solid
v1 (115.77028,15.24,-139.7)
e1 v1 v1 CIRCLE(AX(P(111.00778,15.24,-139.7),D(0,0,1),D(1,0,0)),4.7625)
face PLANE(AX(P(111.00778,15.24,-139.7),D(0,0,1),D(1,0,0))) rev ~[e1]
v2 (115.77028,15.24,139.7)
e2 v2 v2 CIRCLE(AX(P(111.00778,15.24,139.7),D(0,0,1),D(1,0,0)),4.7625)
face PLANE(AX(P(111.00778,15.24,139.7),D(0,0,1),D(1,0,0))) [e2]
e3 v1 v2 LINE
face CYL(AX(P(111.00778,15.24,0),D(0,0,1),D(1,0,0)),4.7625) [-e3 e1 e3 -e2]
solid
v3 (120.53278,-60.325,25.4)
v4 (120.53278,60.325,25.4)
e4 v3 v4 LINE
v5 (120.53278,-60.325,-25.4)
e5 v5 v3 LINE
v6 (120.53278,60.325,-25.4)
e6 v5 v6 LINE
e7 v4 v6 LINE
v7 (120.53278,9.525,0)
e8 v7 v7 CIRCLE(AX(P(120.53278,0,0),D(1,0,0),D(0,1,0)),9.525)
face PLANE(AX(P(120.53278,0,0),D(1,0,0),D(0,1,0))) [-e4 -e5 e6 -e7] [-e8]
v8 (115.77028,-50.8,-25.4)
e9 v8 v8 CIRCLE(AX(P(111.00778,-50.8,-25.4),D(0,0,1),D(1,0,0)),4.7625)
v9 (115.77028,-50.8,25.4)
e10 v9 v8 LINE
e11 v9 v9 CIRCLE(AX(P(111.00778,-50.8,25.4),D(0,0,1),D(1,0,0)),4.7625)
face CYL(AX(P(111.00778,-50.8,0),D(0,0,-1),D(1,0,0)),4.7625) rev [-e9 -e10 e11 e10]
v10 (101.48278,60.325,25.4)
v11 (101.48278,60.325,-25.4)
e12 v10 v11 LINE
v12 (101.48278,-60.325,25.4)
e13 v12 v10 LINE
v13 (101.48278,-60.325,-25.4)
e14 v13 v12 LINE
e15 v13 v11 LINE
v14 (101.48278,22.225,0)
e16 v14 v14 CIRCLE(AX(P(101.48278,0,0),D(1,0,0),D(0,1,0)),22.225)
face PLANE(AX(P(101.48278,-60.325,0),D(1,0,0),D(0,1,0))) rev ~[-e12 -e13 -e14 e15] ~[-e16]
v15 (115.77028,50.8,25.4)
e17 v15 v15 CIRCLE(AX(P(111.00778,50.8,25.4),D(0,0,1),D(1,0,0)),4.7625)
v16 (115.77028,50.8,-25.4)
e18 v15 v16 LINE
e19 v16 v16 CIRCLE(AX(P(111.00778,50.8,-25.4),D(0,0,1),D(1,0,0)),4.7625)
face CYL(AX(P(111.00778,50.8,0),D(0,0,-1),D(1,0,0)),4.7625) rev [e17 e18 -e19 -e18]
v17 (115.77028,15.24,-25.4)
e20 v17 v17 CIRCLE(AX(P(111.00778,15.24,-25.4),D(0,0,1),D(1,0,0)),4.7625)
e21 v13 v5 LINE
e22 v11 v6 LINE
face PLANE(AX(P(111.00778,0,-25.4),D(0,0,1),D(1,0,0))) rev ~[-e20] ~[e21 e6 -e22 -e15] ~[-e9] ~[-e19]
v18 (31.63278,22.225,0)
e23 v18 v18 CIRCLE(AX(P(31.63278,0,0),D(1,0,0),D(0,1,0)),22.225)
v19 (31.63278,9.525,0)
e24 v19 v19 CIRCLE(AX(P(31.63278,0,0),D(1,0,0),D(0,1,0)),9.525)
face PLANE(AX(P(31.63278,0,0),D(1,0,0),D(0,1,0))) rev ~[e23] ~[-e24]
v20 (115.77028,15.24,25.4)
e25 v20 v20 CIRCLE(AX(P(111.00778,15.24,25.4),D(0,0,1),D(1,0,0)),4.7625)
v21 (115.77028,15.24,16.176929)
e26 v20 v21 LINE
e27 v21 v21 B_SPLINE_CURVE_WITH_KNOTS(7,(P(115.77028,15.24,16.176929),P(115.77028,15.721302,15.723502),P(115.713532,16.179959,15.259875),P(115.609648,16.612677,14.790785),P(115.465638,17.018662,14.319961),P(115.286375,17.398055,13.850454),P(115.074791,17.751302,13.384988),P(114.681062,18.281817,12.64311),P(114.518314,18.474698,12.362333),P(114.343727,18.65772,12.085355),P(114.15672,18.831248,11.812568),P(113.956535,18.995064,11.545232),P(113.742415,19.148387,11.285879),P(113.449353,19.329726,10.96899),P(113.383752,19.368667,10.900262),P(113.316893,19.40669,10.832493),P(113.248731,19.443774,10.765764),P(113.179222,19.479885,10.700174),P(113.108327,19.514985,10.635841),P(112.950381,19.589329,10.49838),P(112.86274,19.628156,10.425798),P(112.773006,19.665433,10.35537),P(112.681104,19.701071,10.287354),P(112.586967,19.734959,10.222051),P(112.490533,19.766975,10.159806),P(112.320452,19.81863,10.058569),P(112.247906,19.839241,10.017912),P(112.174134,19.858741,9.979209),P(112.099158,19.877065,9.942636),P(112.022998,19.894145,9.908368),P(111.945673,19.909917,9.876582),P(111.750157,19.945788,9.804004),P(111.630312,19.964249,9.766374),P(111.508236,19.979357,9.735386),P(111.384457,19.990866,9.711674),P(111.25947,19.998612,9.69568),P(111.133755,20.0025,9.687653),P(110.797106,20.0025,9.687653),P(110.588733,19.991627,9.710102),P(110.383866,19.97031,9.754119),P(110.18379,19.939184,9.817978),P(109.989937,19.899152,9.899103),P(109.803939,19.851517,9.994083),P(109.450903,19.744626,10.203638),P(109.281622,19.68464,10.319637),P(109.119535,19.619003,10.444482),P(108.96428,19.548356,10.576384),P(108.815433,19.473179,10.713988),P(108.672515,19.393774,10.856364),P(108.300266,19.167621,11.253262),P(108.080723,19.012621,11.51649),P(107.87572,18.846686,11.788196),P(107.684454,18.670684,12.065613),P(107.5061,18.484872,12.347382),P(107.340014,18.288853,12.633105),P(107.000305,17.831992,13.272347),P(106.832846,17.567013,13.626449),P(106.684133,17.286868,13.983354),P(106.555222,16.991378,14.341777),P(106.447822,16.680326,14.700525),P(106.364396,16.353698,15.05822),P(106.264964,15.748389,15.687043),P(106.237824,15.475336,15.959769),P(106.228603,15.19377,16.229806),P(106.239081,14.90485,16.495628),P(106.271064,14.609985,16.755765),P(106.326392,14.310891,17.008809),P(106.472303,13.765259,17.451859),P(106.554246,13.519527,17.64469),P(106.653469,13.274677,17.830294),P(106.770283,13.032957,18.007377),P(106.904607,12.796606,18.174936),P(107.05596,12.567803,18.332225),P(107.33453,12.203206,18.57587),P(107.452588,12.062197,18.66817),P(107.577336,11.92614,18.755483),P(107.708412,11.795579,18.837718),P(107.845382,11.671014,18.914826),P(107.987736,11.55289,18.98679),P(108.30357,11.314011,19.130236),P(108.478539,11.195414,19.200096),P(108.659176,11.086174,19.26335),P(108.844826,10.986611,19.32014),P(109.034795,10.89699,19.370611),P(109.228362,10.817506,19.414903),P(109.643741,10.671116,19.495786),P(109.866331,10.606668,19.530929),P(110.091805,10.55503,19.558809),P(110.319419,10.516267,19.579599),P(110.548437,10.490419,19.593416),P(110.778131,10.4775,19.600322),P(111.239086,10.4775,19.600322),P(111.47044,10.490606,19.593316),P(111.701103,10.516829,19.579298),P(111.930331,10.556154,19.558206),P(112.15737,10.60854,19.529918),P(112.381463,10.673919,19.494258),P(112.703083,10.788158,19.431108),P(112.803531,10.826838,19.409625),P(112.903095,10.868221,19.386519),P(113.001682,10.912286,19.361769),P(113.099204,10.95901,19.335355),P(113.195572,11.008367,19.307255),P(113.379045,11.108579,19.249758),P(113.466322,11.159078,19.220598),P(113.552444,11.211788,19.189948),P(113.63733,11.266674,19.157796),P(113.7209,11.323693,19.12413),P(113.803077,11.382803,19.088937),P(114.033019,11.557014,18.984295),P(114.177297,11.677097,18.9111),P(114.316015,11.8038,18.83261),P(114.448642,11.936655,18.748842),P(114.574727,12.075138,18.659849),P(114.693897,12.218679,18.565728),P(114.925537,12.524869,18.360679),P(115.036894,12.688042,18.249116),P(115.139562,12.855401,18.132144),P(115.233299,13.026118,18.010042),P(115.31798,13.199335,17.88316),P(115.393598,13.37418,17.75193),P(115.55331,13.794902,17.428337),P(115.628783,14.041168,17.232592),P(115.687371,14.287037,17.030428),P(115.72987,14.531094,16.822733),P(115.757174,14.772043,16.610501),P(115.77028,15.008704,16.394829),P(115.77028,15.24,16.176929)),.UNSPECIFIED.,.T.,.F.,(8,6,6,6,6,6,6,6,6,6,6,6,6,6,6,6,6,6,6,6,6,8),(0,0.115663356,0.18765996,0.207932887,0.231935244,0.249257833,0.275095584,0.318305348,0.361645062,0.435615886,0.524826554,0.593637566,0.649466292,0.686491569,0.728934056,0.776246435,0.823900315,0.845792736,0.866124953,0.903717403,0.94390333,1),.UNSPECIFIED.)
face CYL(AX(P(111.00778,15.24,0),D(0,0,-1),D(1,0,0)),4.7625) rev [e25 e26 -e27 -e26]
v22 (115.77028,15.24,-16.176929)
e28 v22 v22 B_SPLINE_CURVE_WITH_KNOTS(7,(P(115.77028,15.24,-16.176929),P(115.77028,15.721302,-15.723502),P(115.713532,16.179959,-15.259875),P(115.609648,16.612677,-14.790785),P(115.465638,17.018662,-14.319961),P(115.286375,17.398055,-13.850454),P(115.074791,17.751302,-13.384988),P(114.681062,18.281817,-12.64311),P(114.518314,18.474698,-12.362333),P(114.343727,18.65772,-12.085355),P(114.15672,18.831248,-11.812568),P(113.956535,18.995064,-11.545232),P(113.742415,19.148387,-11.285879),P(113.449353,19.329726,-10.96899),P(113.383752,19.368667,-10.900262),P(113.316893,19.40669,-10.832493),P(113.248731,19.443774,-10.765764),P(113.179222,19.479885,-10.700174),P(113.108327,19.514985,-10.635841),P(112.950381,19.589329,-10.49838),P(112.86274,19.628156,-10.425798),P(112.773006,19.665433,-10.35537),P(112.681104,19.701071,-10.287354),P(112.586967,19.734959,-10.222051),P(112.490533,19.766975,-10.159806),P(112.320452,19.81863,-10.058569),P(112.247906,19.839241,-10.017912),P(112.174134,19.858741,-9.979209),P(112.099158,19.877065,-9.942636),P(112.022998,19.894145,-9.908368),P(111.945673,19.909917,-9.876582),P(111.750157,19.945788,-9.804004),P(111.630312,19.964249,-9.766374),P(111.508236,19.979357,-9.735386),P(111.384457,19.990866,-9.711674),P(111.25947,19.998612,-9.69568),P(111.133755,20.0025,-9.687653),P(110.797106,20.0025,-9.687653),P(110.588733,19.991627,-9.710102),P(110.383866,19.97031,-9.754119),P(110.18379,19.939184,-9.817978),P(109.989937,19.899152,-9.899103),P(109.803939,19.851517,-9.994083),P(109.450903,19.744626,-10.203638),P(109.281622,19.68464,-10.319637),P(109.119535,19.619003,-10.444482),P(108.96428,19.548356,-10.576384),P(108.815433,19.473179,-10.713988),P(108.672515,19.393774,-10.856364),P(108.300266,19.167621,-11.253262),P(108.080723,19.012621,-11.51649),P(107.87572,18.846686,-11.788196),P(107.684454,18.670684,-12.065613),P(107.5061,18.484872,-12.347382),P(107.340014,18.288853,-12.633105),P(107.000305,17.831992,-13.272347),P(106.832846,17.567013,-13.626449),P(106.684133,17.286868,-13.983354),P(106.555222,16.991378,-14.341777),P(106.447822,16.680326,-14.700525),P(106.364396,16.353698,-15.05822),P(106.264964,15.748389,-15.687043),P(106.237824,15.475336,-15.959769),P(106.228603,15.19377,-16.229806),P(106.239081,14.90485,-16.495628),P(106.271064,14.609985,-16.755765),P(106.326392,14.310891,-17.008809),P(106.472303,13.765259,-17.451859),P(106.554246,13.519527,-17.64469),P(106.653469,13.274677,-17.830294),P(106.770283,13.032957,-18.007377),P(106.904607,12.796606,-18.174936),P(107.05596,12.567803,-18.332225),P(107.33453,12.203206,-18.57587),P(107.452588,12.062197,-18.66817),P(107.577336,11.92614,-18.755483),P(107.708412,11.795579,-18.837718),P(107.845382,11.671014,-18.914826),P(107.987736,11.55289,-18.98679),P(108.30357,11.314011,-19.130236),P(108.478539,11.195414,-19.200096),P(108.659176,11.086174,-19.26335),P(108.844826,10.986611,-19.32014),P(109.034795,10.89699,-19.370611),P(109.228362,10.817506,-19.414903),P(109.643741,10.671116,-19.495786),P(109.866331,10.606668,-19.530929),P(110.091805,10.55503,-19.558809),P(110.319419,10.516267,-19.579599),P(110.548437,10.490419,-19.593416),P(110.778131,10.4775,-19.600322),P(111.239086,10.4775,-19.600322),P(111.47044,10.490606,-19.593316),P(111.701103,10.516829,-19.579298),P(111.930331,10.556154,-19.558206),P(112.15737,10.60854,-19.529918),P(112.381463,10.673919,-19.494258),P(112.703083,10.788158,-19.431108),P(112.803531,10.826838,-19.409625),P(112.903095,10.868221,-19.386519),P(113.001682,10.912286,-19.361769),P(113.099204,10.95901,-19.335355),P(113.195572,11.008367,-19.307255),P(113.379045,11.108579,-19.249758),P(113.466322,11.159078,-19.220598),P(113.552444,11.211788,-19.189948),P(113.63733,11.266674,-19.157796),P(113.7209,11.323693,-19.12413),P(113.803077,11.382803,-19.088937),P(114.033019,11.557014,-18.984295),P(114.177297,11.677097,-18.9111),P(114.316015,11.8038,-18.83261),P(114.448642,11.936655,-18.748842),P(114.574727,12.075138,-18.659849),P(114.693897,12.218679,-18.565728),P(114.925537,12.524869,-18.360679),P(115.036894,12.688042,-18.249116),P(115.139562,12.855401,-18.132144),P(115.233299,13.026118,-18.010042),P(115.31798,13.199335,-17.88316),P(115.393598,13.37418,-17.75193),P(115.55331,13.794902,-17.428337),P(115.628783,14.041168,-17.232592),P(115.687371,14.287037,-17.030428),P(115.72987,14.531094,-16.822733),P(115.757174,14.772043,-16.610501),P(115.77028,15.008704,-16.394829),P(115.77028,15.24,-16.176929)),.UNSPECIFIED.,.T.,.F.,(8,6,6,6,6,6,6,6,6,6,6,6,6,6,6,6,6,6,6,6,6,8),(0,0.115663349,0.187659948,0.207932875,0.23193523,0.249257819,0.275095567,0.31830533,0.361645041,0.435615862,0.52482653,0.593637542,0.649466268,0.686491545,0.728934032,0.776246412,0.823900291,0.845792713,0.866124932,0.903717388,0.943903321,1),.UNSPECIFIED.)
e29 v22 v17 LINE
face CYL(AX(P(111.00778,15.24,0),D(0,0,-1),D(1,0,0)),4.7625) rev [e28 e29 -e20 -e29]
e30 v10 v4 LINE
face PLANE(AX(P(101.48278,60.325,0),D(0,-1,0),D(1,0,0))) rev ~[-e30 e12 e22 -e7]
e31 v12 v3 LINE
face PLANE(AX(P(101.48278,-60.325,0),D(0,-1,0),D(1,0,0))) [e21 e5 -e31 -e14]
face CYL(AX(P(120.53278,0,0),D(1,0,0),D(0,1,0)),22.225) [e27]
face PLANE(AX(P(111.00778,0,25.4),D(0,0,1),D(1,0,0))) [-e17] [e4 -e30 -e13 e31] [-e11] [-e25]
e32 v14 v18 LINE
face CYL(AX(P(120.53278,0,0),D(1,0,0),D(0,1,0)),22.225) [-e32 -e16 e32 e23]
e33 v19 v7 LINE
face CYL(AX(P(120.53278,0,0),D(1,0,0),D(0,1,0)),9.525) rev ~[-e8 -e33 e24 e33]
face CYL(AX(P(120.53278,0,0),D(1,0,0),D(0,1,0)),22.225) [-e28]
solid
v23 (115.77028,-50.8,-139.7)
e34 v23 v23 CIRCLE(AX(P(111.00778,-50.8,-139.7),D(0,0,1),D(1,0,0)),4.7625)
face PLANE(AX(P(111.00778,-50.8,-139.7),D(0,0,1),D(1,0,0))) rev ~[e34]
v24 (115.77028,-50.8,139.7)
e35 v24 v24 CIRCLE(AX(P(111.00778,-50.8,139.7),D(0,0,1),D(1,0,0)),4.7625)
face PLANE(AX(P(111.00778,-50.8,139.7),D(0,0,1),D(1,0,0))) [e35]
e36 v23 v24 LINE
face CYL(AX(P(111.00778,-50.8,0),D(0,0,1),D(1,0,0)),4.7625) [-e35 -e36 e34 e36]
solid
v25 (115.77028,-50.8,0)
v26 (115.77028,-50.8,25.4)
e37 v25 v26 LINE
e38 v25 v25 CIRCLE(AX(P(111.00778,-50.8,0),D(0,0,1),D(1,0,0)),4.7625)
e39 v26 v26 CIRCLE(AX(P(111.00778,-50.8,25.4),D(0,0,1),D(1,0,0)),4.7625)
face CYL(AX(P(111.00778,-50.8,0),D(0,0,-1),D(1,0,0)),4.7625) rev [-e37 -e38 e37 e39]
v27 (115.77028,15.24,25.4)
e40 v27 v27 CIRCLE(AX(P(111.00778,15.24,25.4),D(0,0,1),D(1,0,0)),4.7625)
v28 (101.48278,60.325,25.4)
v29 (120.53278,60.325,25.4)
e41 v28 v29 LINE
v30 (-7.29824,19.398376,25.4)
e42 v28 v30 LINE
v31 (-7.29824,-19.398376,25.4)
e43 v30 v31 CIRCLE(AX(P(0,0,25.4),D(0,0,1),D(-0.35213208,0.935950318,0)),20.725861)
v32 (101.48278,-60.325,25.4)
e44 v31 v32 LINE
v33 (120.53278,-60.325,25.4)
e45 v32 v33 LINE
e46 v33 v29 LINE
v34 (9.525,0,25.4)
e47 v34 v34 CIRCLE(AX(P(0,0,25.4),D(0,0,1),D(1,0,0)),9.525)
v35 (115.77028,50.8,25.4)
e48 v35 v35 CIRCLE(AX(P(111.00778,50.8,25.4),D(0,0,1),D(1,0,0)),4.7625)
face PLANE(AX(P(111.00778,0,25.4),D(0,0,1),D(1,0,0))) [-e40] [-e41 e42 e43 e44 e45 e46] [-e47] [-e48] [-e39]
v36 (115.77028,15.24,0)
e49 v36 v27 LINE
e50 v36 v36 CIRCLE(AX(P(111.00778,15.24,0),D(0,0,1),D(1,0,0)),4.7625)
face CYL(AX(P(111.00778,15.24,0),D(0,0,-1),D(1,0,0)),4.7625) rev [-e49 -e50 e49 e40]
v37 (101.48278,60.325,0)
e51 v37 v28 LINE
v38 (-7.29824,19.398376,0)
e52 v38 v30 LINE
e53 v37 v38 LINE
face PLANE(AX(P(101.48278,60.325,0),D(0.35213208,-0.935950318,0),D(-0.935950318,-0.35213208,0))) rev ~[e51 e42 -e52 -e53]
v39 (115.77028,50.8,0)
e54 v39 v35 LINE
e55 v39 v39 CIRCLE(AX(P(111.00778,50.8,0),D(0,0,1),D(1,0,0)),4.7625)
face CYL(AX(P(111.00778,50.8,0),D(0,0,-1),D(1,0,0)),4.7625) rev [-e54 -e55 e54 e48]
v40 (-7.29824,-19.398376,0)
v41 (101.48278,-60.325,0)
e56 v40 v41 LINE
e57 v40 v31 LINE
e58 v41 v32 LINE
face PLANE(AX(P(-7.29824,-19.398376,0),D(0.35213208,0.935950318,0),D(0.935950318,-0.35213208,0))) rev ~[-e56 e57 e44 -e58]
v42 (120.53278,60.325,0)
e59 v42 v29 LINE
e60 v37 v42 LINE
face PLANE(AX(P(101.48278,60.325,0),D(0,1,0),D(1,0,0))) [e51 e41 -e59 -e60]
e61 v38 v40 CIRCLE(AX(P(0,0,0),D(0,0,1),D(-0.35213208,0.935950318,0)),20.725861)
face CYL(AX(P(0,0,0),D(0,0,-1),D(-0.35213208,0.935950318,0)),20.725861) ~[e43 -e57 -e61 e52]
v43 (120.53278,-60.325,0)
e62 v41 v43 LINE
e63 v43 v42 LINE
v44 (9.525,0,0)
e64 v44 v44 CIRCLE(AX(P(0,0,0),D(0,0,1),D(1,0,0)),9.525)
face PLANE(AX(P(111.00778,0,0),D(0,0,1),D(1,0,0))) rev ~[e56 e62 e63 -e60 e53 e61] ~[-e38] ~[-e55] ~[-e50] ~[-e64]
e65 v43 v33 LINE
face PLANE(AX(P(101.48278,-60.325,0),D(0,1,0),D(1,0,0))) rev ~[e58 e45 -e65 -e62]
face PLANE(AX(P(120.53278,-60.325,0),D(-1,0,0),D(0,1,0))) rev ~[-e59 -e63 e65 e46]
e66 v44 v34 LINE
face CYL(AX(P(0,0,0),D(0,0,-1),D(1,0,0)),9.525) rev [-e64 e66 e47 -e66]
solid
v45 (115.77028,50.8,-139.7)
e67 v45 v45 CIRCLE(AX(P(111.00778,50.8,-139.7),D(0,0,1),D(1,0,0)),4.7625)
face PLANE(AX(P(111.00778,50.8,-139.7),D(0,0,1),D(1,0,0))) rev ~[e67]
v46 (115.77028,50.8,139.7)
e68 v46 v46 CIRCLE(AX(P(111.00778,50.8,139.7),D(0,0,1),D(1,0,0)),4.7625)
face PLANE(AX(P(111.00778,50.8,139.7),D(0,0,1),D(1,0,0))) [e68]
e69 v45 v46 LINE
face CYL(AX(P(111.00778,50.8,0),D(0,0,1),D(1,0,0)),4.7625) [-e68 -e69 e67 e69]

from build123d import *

# Parameters (mm, degrees)
F0_R     = 4.7625
F1_DEPTH = 139.7
F0_W     = 19.05
F0_H     = 120.65
F0_R_2   = 9.525
F2_DEPTH = 25.4
F3_DEPTH = 25.4
F4_R     = 22.225
F4_R_2   = 9.525
F5_DEPTH = 88.9
F6_DEPTH = 141.2596404097


with BuildPart() as f1:
    # F0 (on Top) → F1 (new body, symmetric)
    with BuildSketch(Plane.XY):
        with Locations((111.0077798367, 50.8)):
            Circle(F0_R)
    extrude(amount=F1_DEPTH, both=True)


with BuildPart() as f1b:
    # F0 (on Top) → F1, piece 2 (new body, symmetric)
    with BuildSketch(Plane.XY):
        with Locations((111.0077798367, 15.24)):
            Circle(F0_R)
    extrude(amount=F1_DEPTH, both=True)


with BuildPart() as f1c:
    # F0 (on Top) → F1, piece 3 (new body, symmetric)
    with BuildSketch(Plane.XY):
        with Locations((111.0077798367, -50.8)):
            Circle(F0_R)
    extrude(amount=F1_DEPTH, both=True)


with BuildPart() as f2:
    # F0 (on Top) → F2 (new body)
    with BuildSketch(Plane.XY):
        with Locations((111.0077798367, 0)):
            Rectangle(F0_W, F0_H)
        with Locations((111.0077798367, -50.8)):
            Circle(F0_R, mode=Mode.SUBTRACT)
        with Locations((111.0077798367, 15.24)):
            Circle(F0_R, mode=Mode.SUBTRACT)
        with Locations((111.0077798367, 50.8)):
            Circle(F0_R, mode=Mode.SUBTRACT)
        with BuildLine():
            Line((101.4827798367, -60.325), (101.4827798367, 60.325))
            Line((101.4827798367, 60.325), (-7.298240398, 19.3983757977))
            ThreePointArc((-7.298240398, 19.3983757977), (-20.7258605731, 0), (-7.298240398, -19.3983757977))
            Line((-7.298240398, -19.3983757977), (101.4827798367, -60.325))
        make_face()
        Circle(F0_R_2, mode=Mode.SUBTRACT)
    extrude(amount=F2_DEPTH)


with BuildPart() as f3:
    # F0 (on Top) → F3 (new body, symmetric)
    with BuildSketch(Plane.XY):
        with Locations((111.0077798367, 0)):
            Rectangle(F0_W, F0_H)
        with Locations((111.0077798367, -50.8)):
            Circle(F0_R, mode=Mode.SUBTRACT)
        with Locations((111.0077798367, 15.24)):
            Circle(F0_R, mode=Mode.SUBTRACT)
        with Locations((111.0077798367, 50.8)):
            Circle(F0_R, mode=Mode.SUBTRACT)
    extrude(amount=F3_DEPTH, both=True)

    # F4 (on face) → F5 (join)
    with BuildSketch(Plane.YZ.offset(120.5327798367)):
        Circle(F4_R)
        Circle(F4_R_2, mode=Mode.SUBTRACT)
    extrude(amount=-F5_DEPTH)

    # F4 (on face) → F6 (cut, through all)
    with BuildSketch(Plane.YZ.offset(120.5327798367)):
        Circle(F4_R_2)
    extrude(amount=-F6_DEPTH, mode=Mode.SUBTRACT)


solid = Compound([f1.part, f1b.part, f1c.part, f2.part, f3.part])
